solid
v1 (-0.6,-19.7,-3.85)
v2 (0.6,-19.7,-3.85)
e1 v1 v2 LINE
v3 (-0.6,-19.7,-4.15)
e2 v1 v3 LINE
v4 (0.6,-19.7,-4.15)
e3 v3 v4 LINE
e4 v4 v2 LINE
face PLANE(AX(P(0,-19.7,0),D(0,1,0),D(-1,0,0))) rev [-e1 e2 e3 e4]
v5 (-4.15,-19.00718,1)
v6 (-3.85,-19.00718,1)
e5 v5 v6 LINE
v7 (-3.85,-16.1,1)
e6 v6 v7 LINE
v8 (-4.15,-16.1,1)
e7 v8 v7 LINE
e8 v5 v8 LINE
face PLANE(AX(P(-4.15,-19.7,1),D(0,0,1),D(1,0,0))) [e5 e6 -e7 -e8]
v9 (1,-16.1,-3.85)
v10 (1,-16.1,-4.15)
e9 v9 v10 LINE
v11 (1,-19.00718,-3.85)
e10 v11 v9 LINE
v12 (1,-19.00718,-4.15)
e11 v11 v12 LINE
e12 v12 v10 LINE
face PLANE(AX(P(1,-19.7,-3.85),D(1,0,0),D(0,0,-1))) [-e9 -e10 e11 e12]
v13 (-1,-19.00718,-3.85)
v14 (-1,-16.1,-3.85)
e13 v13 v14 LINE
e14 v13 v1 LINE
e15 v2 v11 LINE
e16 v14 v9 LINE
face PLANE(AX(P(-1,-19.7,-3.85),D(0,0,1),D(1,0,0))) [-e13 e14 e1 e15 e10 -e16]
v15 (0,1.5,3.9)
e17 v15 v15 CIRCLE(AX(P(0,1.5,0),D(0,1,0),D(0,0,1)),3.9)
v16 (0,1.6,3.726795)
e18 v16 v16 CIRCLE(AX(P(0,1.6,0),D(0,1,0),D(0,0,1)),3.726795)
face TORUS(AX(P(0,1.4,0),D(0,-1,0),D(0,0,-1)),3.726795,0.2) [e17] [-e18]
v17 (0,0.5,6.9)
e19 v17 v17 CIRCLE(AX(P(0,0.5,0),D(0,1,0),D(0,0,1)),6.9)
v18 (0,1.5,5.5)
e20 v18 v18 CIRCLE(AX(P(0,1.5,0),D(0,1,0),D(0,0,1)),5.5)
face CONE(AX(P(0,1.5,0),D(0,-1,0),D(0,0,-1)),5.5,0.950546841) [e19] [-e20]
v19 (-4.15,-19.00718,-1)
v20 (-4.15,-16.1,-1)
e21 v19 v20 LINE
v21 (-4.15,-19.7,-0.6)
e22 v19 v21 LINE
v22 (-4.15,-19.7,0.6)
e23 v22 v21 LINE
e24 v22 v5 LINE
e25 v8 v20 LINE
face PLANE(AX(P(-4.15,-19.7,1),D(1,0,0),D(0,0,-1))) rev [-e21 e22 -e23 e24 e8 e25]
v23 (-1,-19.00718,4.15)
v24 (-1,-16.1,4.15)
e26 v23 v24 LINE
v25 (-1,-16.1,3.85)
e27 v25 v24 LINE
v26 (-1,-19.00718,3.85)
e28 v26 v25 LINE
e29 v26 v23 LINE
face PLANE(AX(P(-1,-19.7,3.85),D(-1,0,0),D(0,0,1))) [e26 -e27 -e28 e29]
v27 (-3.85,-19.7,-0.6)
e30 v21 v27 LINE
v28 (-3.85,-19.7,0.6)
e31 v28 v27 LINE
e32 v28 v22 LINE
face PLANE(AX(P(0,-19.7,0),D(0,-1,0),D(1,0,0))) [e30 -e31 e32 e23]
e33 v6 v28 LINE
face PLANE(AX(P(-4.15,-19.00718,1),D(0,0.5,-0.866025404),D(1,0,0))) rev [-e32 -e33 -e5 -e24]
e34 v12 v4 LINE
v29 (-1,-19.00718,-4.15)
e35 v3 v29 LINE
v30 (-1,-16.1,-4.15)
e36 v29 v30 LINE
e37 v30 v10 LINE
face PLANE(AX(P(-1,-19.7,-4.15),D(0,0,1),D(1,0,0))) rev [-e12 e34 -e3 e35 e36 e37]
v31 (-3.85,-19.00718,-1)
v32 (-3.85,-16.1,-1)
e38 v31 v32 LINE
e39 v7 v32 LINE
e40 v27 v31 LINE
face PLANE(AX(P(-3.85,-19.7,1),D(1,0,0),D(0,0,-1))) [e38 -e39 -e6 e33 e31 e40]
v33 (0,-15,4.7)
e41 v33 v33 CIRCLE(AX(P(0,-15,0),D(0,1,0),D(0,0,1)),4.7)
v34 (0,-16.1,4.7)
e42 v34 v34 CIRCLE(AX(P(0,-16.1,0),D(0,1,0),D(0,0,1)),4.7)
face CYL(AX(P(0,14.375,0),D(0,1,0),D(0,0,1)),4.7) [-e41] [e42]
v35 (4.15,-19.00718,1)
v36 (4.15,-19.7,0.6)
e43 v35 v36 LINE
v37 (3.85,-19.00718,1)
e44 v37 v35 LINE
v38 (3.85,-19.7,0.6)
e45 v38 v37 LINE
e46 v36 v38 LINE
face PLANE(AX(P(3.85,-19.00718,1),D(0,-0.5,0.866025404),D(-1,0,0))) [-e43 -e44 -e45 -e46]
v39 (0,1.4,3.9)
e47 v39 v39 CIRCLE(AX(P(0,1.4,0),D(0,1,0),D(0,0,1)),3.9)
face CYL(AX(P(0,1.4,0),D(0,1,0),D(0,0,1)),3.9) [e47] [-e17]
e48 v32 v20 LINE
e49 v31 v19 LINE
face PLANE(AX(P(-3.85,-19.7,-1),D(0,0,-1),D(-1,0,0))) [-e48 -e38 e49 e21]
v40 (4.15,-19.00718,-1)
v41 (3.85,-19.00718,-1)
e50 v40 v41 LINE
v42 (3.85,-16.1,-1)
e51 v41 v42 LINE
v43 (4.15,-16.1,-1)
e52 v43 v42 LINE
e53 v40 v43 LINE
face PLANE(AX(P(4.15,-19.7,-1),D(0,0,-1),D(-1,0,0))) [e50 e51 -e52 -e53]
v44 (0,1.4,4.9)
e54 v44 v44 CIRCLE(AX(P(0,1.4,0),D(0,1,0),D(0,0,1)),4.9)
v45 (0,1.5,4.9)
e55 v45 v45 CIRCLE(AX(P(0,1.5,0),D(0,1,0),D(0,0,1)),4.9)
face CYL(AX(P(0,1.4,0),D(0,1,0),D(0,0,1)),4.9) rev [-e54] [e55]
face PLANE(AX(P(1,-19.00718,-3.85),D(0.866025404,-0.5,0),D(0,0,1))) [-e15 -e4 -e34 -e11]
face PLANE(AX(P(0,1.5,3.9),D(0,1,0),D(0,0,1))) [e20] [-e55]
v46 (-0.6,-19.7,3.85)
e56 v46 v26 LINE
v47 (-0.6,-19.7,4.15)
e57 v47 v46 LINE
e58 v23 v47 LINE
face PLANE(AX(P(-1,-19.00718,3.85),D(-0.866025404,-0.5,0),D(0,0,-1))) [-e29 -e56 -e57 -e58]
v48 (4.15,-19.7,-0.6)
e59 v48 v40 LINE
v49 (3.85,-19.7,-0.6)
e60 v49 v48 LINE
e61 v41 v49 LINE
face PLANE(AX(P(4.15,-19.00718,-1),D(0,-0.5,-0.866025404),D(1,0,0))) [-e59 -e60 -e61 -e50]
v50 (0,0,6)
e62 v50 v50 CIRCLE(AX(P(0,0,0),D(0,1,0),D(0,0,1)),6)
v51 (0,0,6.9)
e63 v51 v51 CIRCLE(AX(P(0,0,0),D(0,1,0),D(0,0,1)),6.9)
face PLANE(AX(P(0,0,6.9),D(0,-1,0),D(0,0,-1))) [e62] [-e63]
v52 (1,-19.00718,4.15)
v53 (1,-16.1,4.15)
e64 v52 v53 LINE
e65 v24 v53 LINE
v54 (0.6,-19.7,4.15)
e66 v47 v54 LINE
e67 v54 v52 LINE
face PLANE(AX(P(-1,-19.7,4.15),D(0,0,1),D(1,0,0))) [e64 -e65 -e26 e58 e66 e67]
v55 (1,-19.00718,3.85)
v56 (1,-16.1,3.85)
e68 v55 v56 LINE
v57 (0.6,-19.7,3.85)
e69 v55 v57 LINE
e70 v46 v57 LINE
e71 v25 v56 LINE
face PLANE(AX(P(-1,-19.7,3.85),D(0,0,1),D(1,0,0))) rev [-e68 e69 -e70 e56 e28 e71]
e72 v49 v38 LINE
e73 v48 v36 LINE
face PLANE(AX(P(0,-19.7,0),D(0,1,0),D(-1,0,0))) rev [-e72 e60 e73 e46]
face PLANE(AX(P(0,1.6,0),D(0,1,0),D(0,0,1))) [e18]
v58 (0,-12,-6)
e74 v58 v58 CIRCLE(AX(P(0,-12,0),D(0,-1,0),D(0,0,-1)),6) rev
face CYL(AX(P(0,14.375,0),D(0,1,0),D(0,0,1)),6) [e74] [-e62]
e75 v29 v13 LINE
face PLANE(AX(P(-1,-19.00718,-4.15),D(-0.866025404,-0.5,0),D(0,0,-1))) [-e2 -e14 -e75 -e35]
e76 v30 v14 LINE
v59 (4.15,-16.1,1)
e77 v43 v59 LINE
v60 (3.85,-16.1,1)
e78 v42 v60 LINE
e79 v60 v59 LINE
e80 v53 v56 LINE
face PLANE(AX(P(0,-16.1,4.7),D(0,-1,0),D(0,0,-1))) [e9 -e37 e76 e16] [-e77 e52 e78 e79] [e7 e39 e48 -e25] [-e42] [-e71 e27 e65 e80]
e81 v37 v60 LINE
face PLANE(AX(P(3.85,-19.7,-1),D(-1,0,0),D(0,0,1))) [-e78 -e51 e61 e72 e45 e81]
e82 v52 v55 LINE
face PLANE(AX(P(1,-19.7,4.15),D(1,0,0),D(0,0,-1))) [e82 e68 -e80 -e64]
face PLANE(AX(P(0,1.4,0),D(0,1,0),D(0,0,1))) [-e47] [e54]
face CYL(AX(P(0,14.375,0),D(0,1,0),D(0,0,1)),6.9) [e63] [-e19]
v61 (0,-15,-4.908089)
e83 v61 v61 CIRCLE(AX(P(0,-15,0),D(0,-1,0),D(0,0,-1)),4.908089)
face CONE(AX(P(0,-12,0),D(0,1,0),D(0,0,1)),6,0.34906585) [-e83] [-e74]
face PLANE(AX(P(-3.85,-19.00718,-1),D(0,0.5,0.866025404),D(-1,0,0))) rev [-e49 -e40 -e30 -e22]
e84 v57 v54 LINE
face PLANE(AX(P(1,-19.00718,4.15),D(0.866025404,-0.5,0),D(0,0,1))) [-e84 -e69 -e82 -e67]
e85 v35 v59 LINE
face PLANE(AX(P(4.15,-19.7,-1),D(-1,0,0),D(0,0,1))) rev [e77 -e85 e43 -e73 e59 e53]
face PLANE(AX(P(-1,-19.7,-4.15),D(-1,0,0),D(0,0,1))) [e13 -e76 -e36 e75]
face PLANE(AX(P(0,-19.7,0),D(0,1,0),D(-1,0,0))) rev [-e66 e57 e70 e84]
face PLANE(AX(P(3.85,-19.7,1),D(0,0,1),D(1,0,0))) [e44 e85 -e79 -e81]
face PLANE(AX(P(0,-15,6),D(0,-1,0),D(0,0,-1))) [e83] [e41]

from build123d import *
from OCP.BRepFilletAPI import BRepFilletAPI_MakeChamfer

# Parameters (mm, degrees)
FILLET1_R           = 0.2
SKETCH2_R           = 4.9
SKETCH2_R_2         = 3.9
CUT_EXTRUDE1_DEPTH  = 0.1
SKETCH3_W           = 2
SKETCH3_H           = 0.3
SKETCH3_W_2         = 0.3
SKETCH3_H_2         = 2
EXTRUDE_THIN1_DEPTH = 3.6
CHAMFER1_SIZE       = 0.4
CHAMFER1_SIZE2      = 0.692820323
CHAMFER2_SIZE       = 3
CHAMFER2_SIZE2      = 1.091910703


with BuildPart() as part:
    # Sketch1 → Revolve1 (revolve)
    with BuildSketch(Plane(origin=(0, 0, 0), x_dir=(0, 0, -1), z_dir=(1, 0, 0))):
        Polygon((0, 1.6), (-3.9, 1.6), (-3.9, 1.5), (-5.5, 1.5), (-6.9, 0.5), (-6.9, 0), (-6, 0), (-6, -15), (-4.7, -15), (-4.7, -16.1), (0, -16.1), align=None)
    revolve(axis=Axis((0, 14.375, 0), (0, -1, 0)))

    # Fillet1
    # the kernel refuses this fillet: 0.2 mm, written as the material it takes off along each edge
    with BuildSketch(Plane(origin=(0, 1.6, 0), x_dir=(0, 0, 1), z_dir=(1, 0, 0))) as fillet1_piece_1:
        with BuildLine():
            CenterArc((3.726794919, 0.2), FILLET1_R, 270, 60)
            Line((3.9, 0.1), (3.903464102, 0.098))
            ThreePointArc((3.903464102, 0.098), (3.904, 0.05), (3.904, 0))
            Line((3.904, 0), (3.9, -0.004))
            Line((3.9, -0.004), (3.726794919, -0.004))
            Line((3.726794919, -0.004), (3.726794919, 0))
        make_face()
    revolve(axis=Axis((0, 1.6, 0), (0, -1, 0)), mode=Mode.SUBTRACT)

    # Sketch2 → Cut-Extrude1 (cut)
    with BuildSketch(Plane(origin=(0, 1.5, 0), x_dir=(1, 0, 0), z_dir=(0, 1, 0))):
        with Locations(Location((0, 0, 0), (0, 0, 270))):
            Circle(SKETCH2_R)
        with Locations(Location((0, 0, 0), (0, 0, 270))):
            Circle(SKETCH2_R_2, mode=Mode.SUBTRACT)
    extrude(amount=-CUT_EXTRUDE1_DEPTH, mode=Mode.SUBTRACT)

    # Sketch3 → Extrude-Thin1 (add)
    with BuildSketch(Plane.XZ.offset(16.1)):
        with Locations((0, 4)):
            Rectangle(SKETCH3_W, SKETCH3_H)
        with Locations((0, -4)):
            Rectangle(SKETCH3_W, SKETCH3_H)
        with Locations((-4, 0)):
            Rectangle(SKETCH3_W_2, SKETCH3_H_2)
        with Locations((4, 0)):
            Rectangle(SKETCH3_W_2, SKETCH3_H_2)
    extrude(amount=EXTRUDE_THIN1_DEPTH)

    # Chamfer1: one chamfer whose edges measure the first distance from different faces: ONE call of the kernel's chamfer builder (chamfer() names one face for all edges)
    chamfer1_edges_1 = [part.edges().sort_by_distance(p)[0] for p in [
        (1, -19.7, 4),
        (-1, -19.7, 4),
    ]]
    chamfer1_side_1 = [part.faces().sort_by_distance(p)[0] for p in [
        (0, -19.7, 4),
    ]]
    chamfer1_edges_2 = [part.edges().sort_by_distance(p)[0] for p in [
        (1, -19.7, -4),
        (-1, -19.7, -4),
    ]]
    chamfer1_side_2 = [part.faces().sort_by_distance(p)[0] for p in [
        (0, -19.7, -4),
    ]]
    chamfer1_edges_3 = [part.edges().sort_by_distance(p)[0] for p in [
        (-4, -19.7, -1),
        (-4, -19.7, 1),
    ]]
    chamfer1_side_3 = [part.faces().sort_by_distance(p)[0] for p in [
        (-4, -19.7, 0),
    ]]
    chamfer1_edges_4 = [part.edges().sort_by_distance(p)[0] for p in [
        (4, -19.7, 1),
        (4, -19.7, -1),
    ]]
    chamfer1_side_4 = [part.faces().sort_by_distance(p)[0] for p in [
        (4, -19.7, 0),
    ]]
    chamfer1 = BRepFilletAPI_MakeChamfer(part.part.solid().wrapped)
    for e in chamfer1_edges_1:
        chamfer1.Add(CHAMFER1_SIZE, CHAMFER1_SIZE2, e.wrapped, chamfer1_side_1[0].wrapped)  # the first distance lies on this face
    for e in chamfer1_edges_2:
        chamfer1.Add(CHAMFER1_SIZE, CHAMFER1_SIZE2, e.wrapped, chamfer1_side_2[0].wrapped)  # the first distance lies on this face
    for e in chamfer1_edges_3:
        chamfer1.Add(CHAMFER1_SIZE, CHAMFER1_SIZE2, e.wrapped, chamfer1_side_3[0].wrapped)  # the first distance lies on this face
    for e in chamfer1_edges_4:
        chamfer1.Add(CHAMFER1_SIZE, CHAMFER1_SIZE2, e.wrapped, chamfer1_side_4[0].wrapped)  # the first distance lies on this face
    add(Compound.cast(chamfer1.Shape()), mode=Mode.REPLACE)

    # Chamfer2
    chamfer2_edges = [part.edges().sort_by_distance(p)[0] for p in [
        (0, -15, -6),
    ]]
    chamfer2_side = [part.faces().sort_by_distance(p)[0] for p in [
        (0, -7.5, -6),
    ]]
    chamfer(chamfer2_edges, length=CHAMFER2_SIZE, length2=CHAMFER2_SIZE2, reference=chamfer2_side[0])


solid = part.part
